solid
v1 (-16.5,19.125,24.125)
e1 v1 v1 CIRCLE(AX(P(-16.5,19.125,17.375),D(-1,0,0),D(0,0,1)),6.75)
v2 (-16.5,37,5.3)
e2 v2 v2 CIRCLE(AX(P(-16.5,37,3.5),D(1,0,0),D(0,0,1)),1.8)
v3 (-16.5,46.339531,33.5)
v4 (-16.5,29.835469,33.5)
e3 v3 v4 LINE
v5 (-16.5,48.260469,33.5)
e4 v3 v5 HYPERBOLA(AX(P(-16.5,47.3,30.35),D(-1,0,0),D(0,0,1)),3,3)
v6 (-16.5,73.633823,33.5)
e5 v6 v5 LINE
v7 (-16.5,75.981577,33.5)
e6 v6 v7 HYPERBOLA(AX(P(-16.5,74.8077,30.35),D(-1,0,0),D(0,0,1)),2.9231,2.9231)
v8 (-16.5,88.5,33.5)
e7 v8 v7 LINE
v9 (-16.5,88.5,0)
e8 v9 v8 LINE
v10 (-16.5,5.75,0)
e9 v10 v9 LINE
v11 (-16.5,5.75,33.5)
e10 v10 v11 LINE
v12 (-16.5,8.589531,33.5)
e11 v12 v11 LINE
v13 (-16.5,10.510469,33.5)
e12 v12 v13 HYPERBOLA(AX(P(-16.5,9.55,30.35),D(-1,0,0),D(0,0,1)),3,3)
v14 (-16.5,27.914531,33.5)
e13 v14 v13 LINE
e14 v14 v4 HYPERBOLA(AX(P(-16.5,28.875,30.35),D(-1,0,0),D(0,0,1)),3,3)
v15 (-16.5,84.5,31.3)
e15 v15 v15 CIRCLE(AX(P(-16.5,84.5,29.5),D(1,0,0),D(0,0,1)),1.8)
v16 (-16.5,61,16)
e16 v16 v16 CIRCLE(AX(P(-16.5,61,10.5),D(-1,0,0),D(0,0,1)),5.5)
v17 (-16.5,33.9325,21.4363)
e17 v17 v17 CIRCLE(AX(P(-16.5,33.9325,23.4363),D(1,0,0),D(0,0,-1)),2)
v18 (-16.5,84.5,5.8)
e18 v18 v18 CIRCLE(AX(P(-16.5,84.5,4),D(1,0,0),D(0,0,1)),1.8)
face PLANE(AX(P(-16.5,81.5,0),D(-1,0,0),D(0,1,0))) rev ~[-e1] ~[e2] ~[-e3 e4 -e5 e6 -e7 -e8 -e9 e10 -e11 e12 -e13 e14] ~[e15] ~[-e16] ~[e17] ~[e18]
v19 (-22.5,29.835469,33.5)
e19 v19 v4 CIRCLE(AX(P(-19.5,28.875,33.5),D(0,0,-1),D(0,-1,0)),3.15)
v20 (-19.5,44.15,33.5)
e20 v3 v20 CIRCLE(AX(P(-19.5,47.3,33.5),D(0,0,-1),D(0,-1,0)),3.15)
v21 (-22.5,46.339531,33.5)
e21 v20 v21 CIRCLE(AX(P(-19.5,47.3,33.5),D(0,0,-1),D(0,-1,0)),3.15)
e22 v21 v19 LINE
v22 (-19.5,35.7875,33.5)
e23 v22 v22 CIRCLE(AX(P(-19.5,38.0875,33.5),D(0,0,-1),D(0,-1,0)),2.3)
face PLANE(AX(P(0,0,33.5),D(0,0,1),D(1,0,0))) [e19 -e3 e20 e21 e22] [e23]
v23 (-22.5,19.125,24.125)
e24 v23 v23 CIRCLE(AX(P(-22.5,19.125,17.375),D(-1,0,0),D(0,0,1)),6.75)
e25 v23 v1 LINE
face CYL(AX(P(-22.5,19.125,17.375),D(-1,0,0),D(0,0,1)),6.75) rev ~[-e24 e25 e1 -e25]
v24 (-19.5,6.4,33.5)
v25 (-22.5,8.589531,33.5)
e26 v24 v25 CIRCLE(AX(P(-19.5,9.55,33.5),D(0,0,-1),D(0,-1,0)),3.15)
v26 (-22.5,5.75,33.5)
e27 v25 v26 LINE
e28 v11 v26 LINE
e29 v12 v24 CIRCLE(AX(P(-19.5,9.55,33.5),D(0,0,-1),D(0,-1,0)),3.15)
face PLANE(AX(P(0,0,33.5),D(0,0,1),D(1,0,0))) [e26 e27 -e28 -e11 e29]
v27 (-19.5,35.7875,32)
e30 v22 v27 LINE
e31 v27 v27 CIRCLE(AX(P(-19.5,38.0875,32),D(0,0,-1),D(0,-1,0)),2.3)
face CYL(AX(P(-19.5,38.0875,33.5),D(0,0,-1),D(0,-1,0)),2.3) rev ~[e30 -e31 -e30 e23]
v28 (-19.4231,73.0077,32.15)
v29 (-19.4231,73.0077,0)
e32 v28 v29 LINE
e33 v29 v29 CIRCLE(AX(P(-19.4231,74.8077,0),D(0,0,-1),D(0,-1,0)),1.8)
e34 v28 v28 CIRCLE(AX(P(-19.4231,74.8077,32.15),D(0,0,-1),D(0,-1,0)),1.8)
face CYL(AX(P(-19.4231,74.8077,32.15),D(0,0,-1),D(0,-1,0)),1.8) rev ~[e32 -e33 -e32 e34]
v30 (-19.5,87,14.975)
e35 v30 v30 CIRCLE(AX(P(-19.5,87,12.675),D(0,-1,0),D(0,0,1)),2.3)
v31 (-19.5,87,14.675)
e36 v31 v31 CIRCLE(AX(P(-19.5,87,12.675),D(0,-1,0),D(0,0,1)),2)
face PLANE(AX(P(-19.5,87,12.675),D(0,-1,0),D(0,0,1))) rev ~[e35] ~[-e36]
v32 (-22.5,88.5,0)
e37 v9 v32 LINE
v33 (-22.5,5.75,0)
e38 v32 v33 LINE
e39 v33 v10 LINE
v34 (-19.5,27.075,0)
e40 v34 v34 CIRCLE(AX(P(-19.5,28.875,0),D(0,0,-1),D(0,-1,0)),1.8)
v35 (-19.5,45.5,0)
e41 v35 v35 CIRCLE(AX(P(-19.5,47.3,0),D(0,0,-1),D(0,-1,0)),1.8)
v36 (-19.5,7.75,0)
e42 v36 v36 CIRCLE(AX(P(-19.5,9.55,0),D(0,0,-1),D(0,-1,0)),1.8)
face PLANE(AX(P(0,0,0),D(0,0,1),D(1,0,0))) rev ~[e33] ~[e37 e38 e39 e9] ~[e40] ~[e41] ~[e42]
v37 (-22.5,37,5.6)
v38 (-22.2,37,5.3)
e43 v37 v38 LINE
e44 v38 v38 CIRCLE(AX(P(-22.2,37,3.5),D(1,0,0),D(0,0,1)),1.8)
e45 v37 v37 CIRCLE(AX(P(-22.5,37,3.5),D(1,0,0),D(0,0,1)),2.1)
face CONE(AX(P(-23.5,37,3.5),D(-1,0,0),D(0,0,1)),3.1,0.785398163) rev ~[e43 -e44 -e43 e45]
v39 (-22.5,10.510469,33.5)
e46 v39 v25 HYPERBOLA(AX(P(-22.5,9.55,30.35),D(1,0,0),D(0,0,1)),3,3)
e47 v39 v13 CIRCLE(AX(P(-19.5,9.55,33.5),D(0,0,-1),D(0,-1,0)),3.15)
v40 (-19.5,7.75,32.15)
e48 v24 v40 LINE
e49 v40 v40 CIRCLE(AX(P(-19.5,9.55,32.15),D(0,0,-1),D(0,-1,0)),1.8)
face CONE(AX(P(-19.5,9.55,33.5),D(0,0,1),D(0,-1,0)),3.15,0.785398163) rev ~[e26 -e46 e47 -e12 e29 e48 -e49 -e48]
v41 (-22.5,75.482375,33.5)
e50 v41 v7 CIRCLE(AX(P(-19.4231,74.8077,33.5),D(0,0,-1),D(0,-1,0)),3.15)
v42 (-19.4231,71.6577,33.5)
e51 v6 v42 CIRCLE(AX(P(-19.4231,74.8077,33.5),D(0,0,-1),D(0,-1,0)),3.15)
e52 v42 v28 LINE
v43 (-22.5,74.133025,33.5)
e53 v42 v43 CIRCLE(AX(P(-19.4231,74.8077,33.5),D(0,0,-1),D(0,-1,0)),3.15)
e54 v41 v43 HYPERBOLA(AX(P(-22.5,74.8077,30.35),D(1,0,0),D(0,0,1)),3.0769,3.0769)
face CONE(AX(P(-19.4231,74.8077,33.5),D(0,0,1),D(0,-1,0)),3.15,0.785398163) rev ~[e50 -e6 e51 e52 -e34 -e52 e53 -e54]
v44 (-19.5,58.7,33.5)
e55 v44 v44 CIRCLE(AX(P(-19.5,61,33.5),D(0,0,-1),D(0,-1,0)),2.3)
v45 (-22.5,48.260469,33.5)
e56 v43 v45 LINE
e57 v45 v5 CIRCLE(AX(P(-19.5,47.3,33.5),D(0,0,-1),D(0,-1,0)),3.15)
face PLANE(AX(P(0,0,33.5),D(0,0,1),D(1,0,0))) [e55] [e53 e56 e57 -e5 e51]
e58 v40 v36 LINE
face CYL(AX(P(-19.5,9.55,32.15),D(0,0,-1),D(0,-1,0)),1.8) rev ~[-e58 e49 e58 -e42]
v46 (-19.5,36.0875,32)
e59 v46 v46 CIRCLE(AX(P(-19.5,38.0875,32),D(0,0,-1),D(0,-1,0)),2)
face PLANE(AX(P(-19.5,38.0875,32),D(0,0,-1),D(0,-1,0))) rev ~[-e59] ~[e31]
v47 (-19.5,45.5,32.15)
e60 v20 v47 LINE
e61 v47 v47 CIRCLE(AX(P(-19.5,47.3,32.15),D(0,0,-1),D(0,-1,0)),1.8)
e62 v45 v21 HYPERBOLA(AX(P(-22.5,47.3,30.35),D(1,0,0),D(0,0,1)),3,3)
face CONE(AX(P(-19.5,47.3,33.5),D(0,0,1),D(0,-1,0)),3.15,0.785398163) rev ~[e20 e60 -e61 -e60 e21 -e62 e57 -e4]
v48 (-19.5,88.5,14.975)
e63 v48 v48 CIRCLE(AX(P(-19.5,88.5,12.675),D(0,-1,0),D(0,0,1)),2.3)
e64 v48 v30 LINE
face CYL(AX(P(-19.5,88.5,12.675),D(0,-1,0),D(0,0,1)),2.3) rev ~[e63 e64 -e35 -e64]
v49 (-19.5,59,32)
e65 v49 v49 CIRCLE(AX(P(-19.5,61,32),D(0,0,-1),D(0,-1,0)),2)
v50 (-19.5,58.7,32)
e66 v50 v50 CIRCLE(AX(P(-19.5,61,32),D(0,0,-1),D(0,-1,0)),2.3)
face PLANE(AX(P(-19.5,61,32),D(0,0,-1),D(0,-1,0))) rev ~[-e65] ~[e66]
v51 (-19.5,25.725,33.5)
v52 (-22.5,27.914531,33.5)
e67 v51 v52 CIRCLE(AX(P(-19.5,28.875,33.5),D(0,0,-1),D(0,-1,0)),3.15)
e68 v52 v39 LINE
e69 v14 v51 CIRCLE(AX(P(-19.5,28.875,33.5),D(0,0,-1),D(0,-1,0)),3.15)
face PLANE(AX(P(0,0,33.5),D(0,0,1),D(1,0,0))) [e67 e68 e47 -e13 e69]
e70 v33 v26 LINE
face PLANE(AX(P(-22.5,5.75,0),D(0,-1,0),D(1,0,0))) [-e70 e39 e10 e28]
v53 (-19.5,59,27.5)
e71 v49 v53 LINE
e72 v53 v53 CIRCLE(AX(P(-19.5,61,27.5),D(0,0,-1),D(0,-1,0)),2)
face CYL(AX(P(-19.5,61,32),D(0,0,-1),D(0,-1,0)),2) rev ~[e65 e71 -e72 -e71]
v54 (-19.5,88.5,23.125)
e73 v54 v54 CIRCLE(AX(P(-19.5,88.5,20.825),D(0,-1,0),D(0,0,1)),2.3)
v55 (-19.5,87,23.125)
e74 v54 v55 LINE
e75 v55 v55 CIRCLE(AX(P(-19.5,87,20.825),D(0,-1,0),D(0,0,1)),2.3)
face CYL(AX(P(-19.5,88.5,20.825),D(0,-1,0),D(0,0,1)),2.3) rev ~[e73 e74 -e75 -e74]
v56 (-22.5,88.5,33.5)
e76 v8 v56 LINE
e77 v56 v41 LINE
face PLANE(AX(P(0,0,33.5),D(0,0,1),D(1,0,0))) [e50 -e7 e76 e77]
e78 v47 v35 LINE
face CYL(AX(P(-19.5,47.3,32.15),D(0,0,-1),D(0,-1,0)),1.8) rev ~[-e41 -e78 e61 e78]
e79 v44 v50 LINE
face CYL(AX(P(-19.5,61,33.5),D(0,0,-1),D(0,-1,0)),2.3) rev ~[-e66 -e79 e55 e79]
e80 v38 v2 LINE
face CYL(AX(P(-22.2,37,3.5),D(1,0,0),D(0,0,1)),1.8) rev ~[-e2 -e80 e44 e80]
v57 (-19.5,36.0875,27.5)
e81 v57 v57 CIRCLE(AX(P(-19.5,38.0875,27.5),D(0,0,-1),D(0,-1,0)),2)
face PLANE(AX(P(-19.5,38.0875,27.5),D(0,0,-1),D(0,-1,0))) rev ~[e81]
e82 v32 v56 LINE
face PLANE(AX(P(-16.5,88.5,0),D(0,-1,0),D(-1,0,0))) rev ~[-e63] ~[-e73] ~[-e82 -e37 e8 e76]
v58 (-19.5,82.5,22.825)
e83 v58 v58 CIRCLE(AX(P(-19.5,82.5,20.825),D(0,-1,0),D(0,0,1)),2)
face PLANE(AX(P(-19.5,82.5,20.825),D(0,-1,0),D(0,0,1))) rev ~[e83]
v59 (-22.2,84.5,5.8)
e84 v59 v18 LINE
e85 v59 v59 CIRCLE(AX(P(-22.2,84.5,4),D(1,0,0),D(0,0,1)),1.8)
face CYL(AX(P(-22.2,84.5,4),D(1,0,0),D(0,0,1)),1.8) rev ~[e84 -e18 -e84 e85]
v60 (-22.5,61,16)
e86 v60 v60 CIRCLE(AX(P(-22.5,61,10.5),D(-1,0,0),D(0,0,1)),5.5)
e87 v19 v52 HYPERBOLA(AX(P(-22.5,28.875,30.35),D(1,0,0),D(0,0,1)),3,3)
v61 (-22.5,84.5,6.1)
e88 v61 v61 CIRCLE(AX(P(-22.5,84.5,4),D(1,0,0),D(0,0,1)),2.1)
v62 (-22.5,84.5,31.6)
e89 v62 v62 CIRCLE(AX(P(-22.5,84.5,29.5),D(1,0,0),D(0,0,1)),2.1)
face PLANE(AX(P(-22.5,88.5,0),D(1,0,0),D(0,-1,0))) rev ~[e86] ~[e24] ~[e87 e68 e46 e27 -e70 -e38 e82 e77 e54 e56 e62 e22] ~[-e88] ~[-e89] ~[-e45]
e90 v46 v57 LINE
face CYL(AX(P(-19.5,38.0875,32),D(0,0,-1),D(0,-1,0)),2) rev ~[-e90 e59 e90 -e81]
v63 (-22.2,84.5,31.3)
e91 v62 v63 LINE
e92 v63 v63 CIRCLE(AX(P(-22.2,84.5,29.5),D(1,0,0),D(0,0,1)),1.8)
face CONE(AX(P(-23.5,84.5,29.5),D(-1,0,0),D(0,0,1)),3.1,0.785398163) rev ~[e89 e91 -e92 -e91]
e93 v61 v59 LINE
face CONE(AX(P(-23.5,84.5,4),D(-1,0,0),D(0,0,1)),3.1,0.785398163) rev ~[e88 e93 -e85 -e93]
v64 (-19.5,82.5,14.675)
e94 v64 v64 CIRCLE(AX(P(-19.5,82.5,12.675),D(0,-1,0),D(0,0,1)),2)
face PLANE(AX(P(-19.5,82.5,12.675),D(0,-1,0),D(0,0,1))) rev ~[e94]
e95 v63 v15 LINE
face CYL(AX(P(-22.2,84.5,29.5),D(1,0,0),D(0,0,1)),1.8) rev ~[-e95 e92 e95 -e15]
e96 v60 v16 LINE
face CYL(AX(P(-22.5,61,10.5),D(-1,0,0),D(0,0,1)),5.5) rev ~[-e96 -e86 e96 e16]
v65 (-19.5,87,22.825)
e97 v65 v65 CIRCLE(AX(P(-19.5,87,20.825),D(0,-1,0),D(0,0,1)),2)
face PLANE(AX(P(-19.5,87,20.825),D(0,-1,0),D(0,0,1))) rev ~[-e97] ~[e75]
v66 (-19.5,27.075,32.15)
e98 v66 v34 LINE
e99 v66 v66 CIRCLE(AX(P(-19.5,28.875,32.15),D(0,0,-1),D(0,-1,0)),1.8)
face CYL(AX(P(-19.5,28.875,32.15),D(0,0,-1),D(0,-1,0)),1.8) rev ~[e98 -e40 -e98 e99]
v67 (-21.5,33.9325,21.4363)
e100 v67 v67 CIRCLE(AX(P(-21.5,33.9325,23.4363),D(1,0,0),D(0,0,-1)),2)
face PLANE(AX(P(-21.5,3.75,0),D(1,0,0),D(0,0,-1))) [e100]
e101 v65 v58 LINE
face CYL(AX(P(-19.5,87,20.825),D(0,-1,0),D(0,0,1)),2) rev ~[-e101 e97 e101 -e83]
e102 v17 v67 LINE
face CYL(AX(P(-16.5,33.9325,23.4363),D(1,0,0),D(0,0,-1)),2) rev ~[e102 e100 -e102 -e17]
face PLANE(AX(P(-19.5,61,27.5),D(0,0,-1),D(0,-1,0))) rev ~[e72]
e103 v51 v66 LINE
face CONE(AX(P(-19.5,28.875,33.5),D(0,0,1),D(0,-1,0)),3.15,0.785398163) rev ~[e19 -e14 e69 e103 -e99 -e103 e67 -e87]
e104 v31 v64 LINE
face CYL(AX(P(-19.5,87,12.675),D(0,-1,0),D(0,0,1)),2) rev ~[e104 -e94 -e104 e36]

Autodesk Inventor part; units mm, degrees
ref_plane "YZ Plane" through (0, 0, 0) normal (1, 0, 0) x (0, 1, 0)
ref_plane "XZ Plane" through (0, 0, 0) normal (0, 1, 0) x (-1, 0, 0)
ref_plane "Work Plane1" through (0, 0, 0) normal (0, 0, 1) x (1, 0, 0)
sketch "Sketch1" plane through (0, 0, 0) normal (0, 0, 1) x (1, 0, 0)
  line L0 (23.5, 88.5) -> (-23.5, 88.5) projected
  line L1 (-23.5, 88.5) -> (-23.5, 36.5) projected
  line L2 (-26.5, 33.5) -> (-89, 33.5) projected
  line L3 (-89, 33.5) -> (-89, -72.5) projected
  line L4 (-89, -72.5) -> (-77, -72.5) projected
  line L5 (-74, -75.5) -> (-74, -93.5) projected
  line L6 (-74, -93.5) -> (74, -93.5) projected
  line L7 (74, -93.5) -> (74, -75.5) projected
  line L8 (77, -72.5) -> (89, -72.5) projected
  line L9 (89, -72.5) -> (89, 33.5) projected
  line L10 (89, 33.5) -> (26.5, 33.5) projected
  line L11 (23.5, 36.5) -> (23.5, 88.5) projected
  line L12 (-4.5, 81.5) -> (-4.5, 36.5) projected
  line L13 (-7.5, 33.5) -> (-13.5, 33.5) projected
  line L14 (-16.5, 36.5) -> (-16.5, 81.5) projected
  line L15 (7.5, 84.5) -> (13.5, 84.5) projected
  line L16 (16.5, 81.5) -> (16.5, 36.5) projected
  line L17 (13.5, 33.5) -> (7.5, 33.5) projected
  line L18 (4.5, 36.5) -> (4.5, 81.5) projected
  line L19 (-13.5, 84.5) -> (-7.5, 84.5) projected
  line L20 (-16.5, 88.5) -> (-22.5, 88.5)
  line L21 (-22.5, 88.5) -> (-22.5, 3.75)
  line L22 (-22.5, 3.75) -> (-16.5, 3.75)
  line L23 (-16.5, 3.75) -> (-16.5, 88.5)
  line L24 (-32.2, 4.75) -> (-59.9, 4.75)
  arc A0 (13.5, 33.5) -> (16.5, 36.5) centre (13.5, 36.5) ccw projected
  arc A1 (4.5, 36.5) -> (7.5, 33.5) centre (7.5, 36.5) ccw projected
  arc A2 (7.5, 84.5) -> (4.5, 81.5) centre (7.5, 81.5) ccw projected
  arc A3 (16.5, 81.5) -> (13.5, 84.5) centre (13.5, 81.5) ccw projected
  arc A4 (-4.5, 81.5) -> (-7.5, 84.5) centre (-7.5, 81.5) ccw projected
  arc A5 (-7.5, 33.5) -> (-4.5, 36.5) centre (-7.5, 36.5) ccw projected
  arc A6 (-16.5, 36.5) -> (-13.5, 33.5) centre (-13.5, 36.5) ccw projected
  arc A7 (-13.5, 84.5) -> (-16.5, 81.5) centre (-13.5, 81.5) ccw projected
  arc A8 (-26.5, 33.5) -> (-23.5, 36.5) centre (-26.5, 36.5) ccw projected
  arc A9 (-74, -75.5) -> (-77, -72.5) centre (-77, -75.5) ccw projected
  arc A10 (77, -72.5) -> (74, -75.5) centre (77, -75.5) ccw projected
  arc A11 (23.5, 36.5) -> (26.5, 33.5) centre (26.5, 36.5) ccw projected
  circle A12 centre (21.5, -85.5) radius 1.8 projected
  circle A13 centre (-64.5, -85.5) radius 1.8 projected
  circle A14 centre (83.4, -16.3889) radius 1.8 projected
  circle A15 centre (-83.4, -19.2889) radius 1.8 projected
  circle A16 centre (-21.5, -85.5) radius 1.8 projected
  circle A17 centre (64.5, -85.5) radius 1.8 projected
  circle A18 centre (39.125, 4.3375) radius 1.0065 projected
  circle A19 centre (-72.95, 4.275) radius 1.0065 projected
  circle A20 centre (39.125, 25.9125) radius 1.0065 projected
  circle A21 centre (72.95, 12.275) radius 1.0065 projected
  circle A22 centre (86, 30.5) radius 1.0065 projected
  circle A23 centre (-86, 30.5) radius 1.0065 projected
  circle A24 centre (-39.125, 12.3375) radius 1.0065 projected
  circle A25 centre (-72.95, 25.975) radius 1.0065 projected
  circle A26 centre (-72.95, 12.275) radius 1.0065 projected
  circle A27 centre (-39.125, 25.9125) radius 1.0065 projected
  circle A28 centre (-86, 7.75) radius 1.0065 projected
  circle A29 centre (86, 7.75) radius 1.0065 projected
  circle A30 centre (72.95, 25.975) radius 1.0065 projected
  circle A31 centre (39.125, 12.3375) radius 1.0065 projected
  circle A32 centre (-39.125, 4.3375) radius 1.0065 projected
  circle A33 centre (72.95, 4.275) radius 1.0065 projected
  circle A34 centre (78, -67.1725) radius 1.2295 projected
  circle A35 centre (-24.1, -73.1) radius 1.2295 projected
  circle A36 centre (24.1, -24.9) radius 1.2295 projected
  circle A37 centre (-42.4984, -44.6666) radius 1.2295 projected
  circle A38 centre (-79, -42.3889) radius 1.2295 projected
  circle A39 centre (-19.5, 28.875) radius 1.2295 projected
  circle A40 centre (19.5, 9.55) radius 1.2295 projected
  circle A41 centre (19.5, 47.3) radius 1.2295 projected
  circle A42 centre (-19.5, 47.3) radius 1.2295 projected
  circle A43 centre (0, 74.7) radius 1.2295 projected
  circle A44 centre (-19.4231, 74.8077) radius 1.2295 projected
  circle A45 centre (19.5, 74.7) radius 1.2295 projected
  circle A46 centre (0, 49.05) radius 1.2295 projected
  circle A47 centre (19.5, 28.875) radius 1.2295 projected
  circle A48 centre (0, 19.125) radius 1.2295 projected
  circle A49 centre (-19.5, 9.55) radius 1.2295 projected
  circle A50 centre (-78, -67.1725) radius 1.2295 projected
  circle A51 centre (-24.1, -24.9) radius 1.2295 projected
  circle A52 centre (24.1, -73.1) radius 1.2295 projected
  circle A53 centre (42.5, -44.6649) radius 1.2295 projected
  circle A54 centre (79, -42.3889) radius 1.2295 projected
  line L25 (74, -12.9454) -> (74, -38.6649) projected
  line L26 (32.5736, -41.3399) -> (10.2484, -66.6122) projected
  line L27 (40.7223, -24.1882) -> (40.7223, -2.7315) projected
  line L28 (15.0791, 0.2685) -> (31.7223, 0.2685) projected
  line L29 (-68.7516, -10.9592) -> (-46.0313, -36.6788) projected
  line L30 (-74, -38.6649) -> (-74, -12.9454) projected
  line L31 (43.7223, 0.2685) -> (62.6769, 0.2685) projected
  line L32 (-40.7223, -2.7315) -> (-40.7223, -24.1882) projected
  line L33 (-45.9707, -26.1743) -> (-64.9252, -4.7177) projected
  line L34 (46.0313, -36.6788) -> (68.7516, -10.9592) projected
  line L35 (-62.6769, 0.2685) -> (-43.7223, 0.2685) projected
  line L36 (34.7223, -2.7315) -> (34.7223, -24.9078) projected
  line L37 (29.5555, -26.9826) -> (10.5667, -7.1519) projected
  line L38 (-31.598, -53.0174) -> (-25.9833, -59.3733) projected
  line L39 (-10.5667, -7.1519) -> (-29.5555, -26.9826) projected
  line L40 (-34.7223, -24.9078) -> (-34.7223, -2.7315) projected
  line L41 (-31.7223, 0.2685) -> (-15.0791, 0.2685) projected
  line L42 (25.9833, -59.3733) -> (31.598, -53.0174) projected
  line L43 (64.9252, -4.7177) -> (45.9707, -26.1743) projected
  line L44 (-10.2484, -66.6122) -> (-32.5736, -41.3399) projected
  line L45 (-32.4921, -37.2789) -> (-10.1668, -13.9638) projected
  line L46 (10.1668, -13.9638) -> (32.4921, -37.2789) projected
  line L47 (29.5955, -81.1563) -> (25.3044, -62.0157) projected
  arc A55 (25.9833, -59.3733) -> (25.3044, -62.0157) centre (28.2317, -61.3594) ccw projected
  line L48 (43.9754, -47.6649) -> (68.9203, -47.6649) projected
  arc A56 (71.5475, -52.1134) -> (68.9203, -47.6649) centre (68.9203, -50.6649) ccw projected
  line L49 (71.5475, -52.1134) -> (58.4661, -75.8408) projected
  line L50 (46.5943, -83.5) -> (32.5229, -83.5) projected
  arc A57 (29.5955, -81.1563) -> (32.5229, -83.5) centre (32.5229, -80.5) ccw projected
  line L51 (-5, -16.0387) -> (-5, -64.6261) projected
  arc A58 (-10.2484, -66.6122) -> (-5, -64.6261) centre (-8, -64.6261) ccw projected
  arc A59 (-32.4921, -37.2789) -> (-32.5736, -41.3399) centre (-30.3253, -39.3537) ccw projected
  arc A60 (-5, -16.0387) -> (-10.1668, -13.9638) centre (-8, -16.0387) ccw projected
  arc A61 (-40.7223, -2.7315) -> (-43.7223, 0.2685) centre (-43.7223, -2.7315) ccw projected
  arc A62 (-45.9707, -26.1743) -> (-40.7223, -24.1882) centre (-43.7223, -24.1882) ccw projected
  arc A63 (-62.6769, 0.2685) -> (-64.9252, -4.7177) centre (-62.6769, -2.7315) ccw projected
  arc A64 (-25.3044, -62.0157) -> (-25.9833, -59.3733) centre (-28.2317, -61.3594) ccw projected
  line L52 (-25.3044, -62.0157) -> (-29.5955, -81.1563) projected
  arc A65 (-32.5229, -83.5) -> (-29.5955, -81.1563) centre (-32.5229, -80.5) ccw projected
  line L53 (-32.5229, -83.5) -> (-46.5943, -83.5) projected
  line L54 (-58.4661, -75.8408) -> (-71.5475, -52.1134) projected
  arc A66 (-68.9203, -47.6649) -> (-71.5475, -52.1134) centre (-68.9203, -50.6649) ccw projected
  line L55 (-68.9203, -47.6649) -> (-43.9754, -47.6649) projected
  line L56 (-49.775, 11.125) -> (-62.3, 11.125) projected
  arc A67 (-62.3, 27.125) -> (-62.3, 11.125) centre (-62.3, 19.125) ccw projected
  line L57 (-62.3, 27.125) -> (-49.775, 27.125) projected
  arc A68 (-49.775, 11.125) -> (-49.775, 27.125) centre (-49.775, 19.125) ccw projected
  arc A69 (-31.7223, 0.2685) -> (-34.7223, -2.7315) centre (-31.7223, -2.7315) ccw projected
  arc A70 (-12.9578, -0.6102) -> (-15.0791, 0.2685) centre (-15.0791, -2.7315) ccw projected
  line L58 (-12.9578, -0.6102) -> (-10.6122, -2.9558) projected
  arc A71 (-10.5667, -7.1519) -> (-10.6122, -2.9558) centre (-12.7335, -5.0771) ccw projected
  arc A72 (-34.7223, -24.9078) -> (-29.5555, -26.9826) centre (-31.7223, -24.9078) ccw projected
  arc A73 (71, -41.6649) -> (74, -38.6649) centre (71, -38.6649) ccw projected
  line L59 (71, -41.6649) -> (48.2797, -41.6649) projected
  arc A74 (46.0313, -36.6788) -> (48.2797, -41.6649) centre (48.2797, -38.6649) ccw projected
  arc A75 (74, -12.9454) -> (68.7516, -10.9592) centre (71, -12.9454) ccw projected
  arc A76 (40.7223, -24.1882) -> (45.9707, -26.1743) centre (43.7223, -24.1882) ccw projected
  arc A77 (43.7223, 0.2685) -> (40.7223, -2.7315) centre (43.7223, -2.7315) ccw projected
  arc A78 (64.9252, -4.7177) -> (62.6769, 0.2685) centre (62.6769, -2.7315) ccw projected
  arc A79 (5, -64.6261) -> (10.2484, -66.6122) centre (8, -64.6261) ccw projected
  line L60 (5, -64.6261) -> (5, -16.0387) projected
  arc A80 (10.1668, -13.9638) -> (5, -16.0387) centre (8, -16.0387) ccw projected
  arc A81 (32.5736, -41.3399) -> (32.4921, -37.2789) centre (30.3253, -39.3537) ccw projected
  arc A82 (29.5555, -26.9826) -> (34.7223, -24.9078) centre (31.7223, -24.9078) ccw projected
  arc A83 (10.6122, -2.9558) -> (10.5667, -7.1519) centre (12.7335, -5.0771) ccw projected
  line L61 (10.6122, -2.9558) -> (12.9578, -0.6102) projected
  arc A84 (15.0791, 0.2685) -> (12.9578, -0.6102) centre (15.0791, -2.7315) ccw projected
  arc A85 (34.7223, -2.7315) -> (31.7223, 0.2685) centre (31.7223, -2.7315) ccw projected
  arc A86 (-48.2797, -41.6649) -> (-46.0313, -36.6788) centre (-48.2797, -38.6649) ccw projected
  line L62 (-48.2797, -41.6649) -> (-71, -41.6649) projected
  arc A87 (-74, -38.6649) -> (-71, -41.6649) centre (-71, -38.6649) ccw projected
  arc A88 (-68.7516, -10.9592) -> (-74, -12.9454) centre (-71, -12.9454) ccw projected
  line L63 (49.775, 27.125) -> (62.3, 27.125) projected
  arc A89 (62.3, 11.125) -> (62.3, 27.125) centre (62.3, 19.125) ccw projected
  line L64 (62.3, 11.125) -> (49.775, 11.125) projected
  arc A90 (49.775, 27.125) -> (49.775, 11.125) centre (49.775, 19.125) ccw projected
  arc A91 (53.1556, -75.734) -> (58.4661, -75.8408) centre (55.8389, -74.3924) ccw projected
  line L65 (53.1556, -75.734) -> (41.2921, -52.0066) projected
  arc A92 (43.9754, -47.6649) -> (41.2921, -52.0066) centre (43.9754, -50.6649) ccw projected
  arc A93 (36.5297, -53.662) -> (31.598, -53.0174) centre (33.8464, -55.0036) ccw projected
  line L66 (36.5297, -53.662) -> (49.2776, -79.1584) projected
  arc A94 (46.5943, -83.5) -> (49.2776, -79.1584) centre (46.5943, -80.5) ccw projected
  arc A95 (-49.2776, -79.1584) -> (-46.5943, -83.5) centre (-46.5943, -80.5) ccw projected
  line L67 (-49.2776, -79.1584) -> (-36.5297, -53.662) projected
  arc A96 (-31.598, -53.0174) -> (-36.5297, -53.662) centre (-33.8464, -55.0036) ccw projected
  arc A97 (-41.2921, -52.0066) -> (-43.9754, -47.6649) centre (-43.9754, -50.6649) ccw projected
  line L68 (-41.2921, -52.0066) -> (-53.1556, -75.734) projected
  arc A98 (-58.4661, -75.8408) -> (-53.1556, -75.734) centre (-55.8389, -74.3924) ccw projected
  point P0 (0, 0)
  point P1 (-16.5, 36.5)
  point P2 (-16.5, 81.5)
  point P3 (7.5, 81.5)
  point P4 (13.5, 81.5)
  point P5 (-7.5, 81.5)
  point P6 (-13.5, 81.5)
  point P7 (-29, -78.5)
  point P8 (-57, -78.5)
  point P9 (29, -78.5)
  point P10 (57, -78.5)
  dimension "d0" = 1
  dimension "d2" = 1
ref_plane "Work Plane2" through (-89, -40.3889, 33.5) normal (0, 0, 1) x (1, 0, 0)
extrude "Extrusion1" add sketch "Sketch1" along normal up to surface (33.5 mm away) contours L23 L14 L22 L21 L0 | A39 | A42 | A44 | A49
sketch "Sketch2" plane through (-22.5, 3.75, 0) normal (-1, 0, 0) x (0, 0, 1)
  arc A0 (15.7043, 9.7757) -> (16.863, 11.545) centre (12.3771, 13.2188) ccw projected
  arc A1 (16.863, 11.545) -> (17.4685, 11.512) centre (17.375, 15.375) ccw projected
  arc A2 (17.4685, 11.512) -> (18.4285, 9.6275) centre (22.1095, 12.6893) ccw projected
  arc A3 (18.4285, 9.6275) -> (19.3146, 9.863) centre (17.375, 15.375) ccw projected
  arc A4 (19.3146, 9.863) -> (19.2121, 11.9755) centre (14.599, 10.6929) ccw projected
  arc A5 (19.2121, 11.9755) -> (19.7212, 12.3047) centre (17.375, 15.375) ccw projected
  arc A6 (19.7212, 12.3047) -> (21.6056, 11.3444) centre (22.7839, 15.9851) ccw projected
  arc A7 (21.6056, 11.3444) -> (22.184, 12.0558) centre (17.375, 15.375) ccw projected
  arc A8 (22.184, 12.0558) -> (20.8594, 13.7045) centre (17.8813, 9.9554) ccw projected
  arc A9 (20.8594, 13.7045) -> (21.0778, 14.2702) centre (17.375, 15.375) ccw projected
  arc A10 (21.0778, 14.2702) -> (23.1668, 14.6008) centre (21.3923, 19.0479) ccw projected
  arc A11 (23.1668, 14.6008) -> (23.2166, 15.5164) centre (17.375, 15.375) ccw projected
  arc A12 (23.2166, 15.5164) -> (21.1758, 16.0716) centre (20.9701, 11.288) ccw projected
  arc A13 (21.1758, 16.0716) -> (21.02, 16.6576) centre (17.375, 15.375) ccw projected
  arc A14 (21.02, 16.6576) -> (22.5157, 18.153) centre (18.4662, 20.7077) ccw projected
  arc A15 (22.5157, 18.153) -> (22.0178, 18.923) centre (17.375, 15.375) ccw projected
  arc A16 (22.0178, 18.923) -> (20.0404, 18.1726) centre (22.6858, 14.1817) ccw projected
  arc A17 (20.0404, 18.1726) -> (19.57, 18.5552) centre (17.375, 15.375) ccw projected
  arc A18 (19.57, 18.5552) -> (19.9011, 20.644) centre (15.1233, 20.3306) ccw projected
  arc A19 (19.9011, 20.644) -> (19.0457, 20.9743) centre (17.375, 15.375) ccw projected
  arc A20 (19.0457, 20.9743) -> (17.887, 19.205) centre (22.3729, 17.5312) ccw projected
  arc A21 (17.887, 19.205) -> (17.2815, 19.238) centre (17.375, 15.375) ccw projected
  arc A22 (17.2815, 19.238) -> (16.3215, 21.1225) centre (12.6405, 18.0607) ccw projected
  arc A23 (16.3215, 21.1225) -> (15.4354, 20.887) centre (17.375, 15.375) ccw projected
  arc A24 (15.4354, 20.887) -> (15.5379, 18.7745) centre (20.151, 20.0571) ccw projected
  arc A25 (15.5379, 18.7745) -> (15.0288, 18.4453) centre (17.375, 15.375) ccw projected
  arc A26 (15.0288, 18.4453) -> (13.1444, 19.4056) centre (11.9661, 14.7649) ccw projected
  arc A27 (13.1444, 19.4056) -> (12.566, 18.6942) centre (17.375, 15.375) ccw projected
  arc A28 (12.566, 18.6942) -> (13.8906, 17.0455) centre (16.8687, 20.7946) ccw projected
  arc A29 (13.8906, 17.0455) -> (13.6722, 16.4798) centre (17.375, 15.375) ccw projected
  arc A30 (13.6722, 16.4798) -> (11.5832, 16.1492) centre (13.3577, 11.7021) ccw projected
  arc A31 (11.5832, 16.1492) -> (11.5334, 15.2336) centre (17.375, 15.375) ccw projected
  arc A32 (11.5334, 15.2336) -> (13.5742, 14.6784) centre (13.7799, 19.462) ccw projected
  arc A33 (13.5742, 14.6784) -> (13.73, 14.0924) centre (17.375, 15.375) ccw projected
  arc A34 (13.73, 14.0924) -> (12.2343, 12.597) centre (16.2838, 10.0423) ccw projected
  arc A35 (12.2343, 12.597) -> (12.7322, 11.827) centre (17.375, 15.375) ccw projected
  arc A36 (12.7322, 11.827) -> (14.7096, 12.5774) centre (12.0642, 16.5683) ccw projected
  arc A37 (14.7096, 12.5774) -> (15.18, 12.1948) centre (17.375, 15.375) ccw projected
  arc A38 (15.18, 12.1948) -> (14.8489, 10.106) centre (19.6267, 10.4194) ccw projected
  arc A39 (14.8489, 10.106) -> (15.7043, 9.7757) centre (17.375, 15.375) ccw projected
  circle A40 centre (17.375, 15.375) radius 6.75
  circle A41 centre (17.375, 15.375) radius 5.8433
  line L0 (23.2183, 15.375) -> (24.125, 15.375)
  circle A42 centre (10.5, 57.25) radius 5.5 projected
  point P0 (0, -3.75)
  dimension "d6" = 13.5
  dimension "d5" = 0.9067
  dimension "d9" = 11
extrude "Extrusion2" cut sketch "Sketch2" against normal up to next contours A39 A38 A37 A36 A35 A34 A33 A32 A31 A30 A29 A28 A27 A26 A25 A24 A23 A22 A21 A20 A19 A18 A17 A16 A15 A14 A13 A12 A11 A10 A9 A8 A7 A6 A5 A4 A3 A2 A1 A0 | A0 A1 A2 A41 | A41 A36 A37 A38 | A4 A5 A6 A41 | A41 A32 A33 A34 | A8 A9 A10 A41 | A41 A28 A29 A30 | A41 A24 A25 A26 | A12 A13 A14 A41 | A41 A20 A21 A22 | A16 A17 A18 A41 | A40 | A42
sketch "Sketch3" plane through (-16.5, 3.75, 0) normal (1, 0, 0) x (0, 0, -1)
  circle A0 centre (-23.4363, 30.1825) radius 2 projected
  point P0 (0, -3.75)
extrude "Extrusion3" cut sketch "Sketch3" against normal blind 5
ref_plane "Work Plane3" through (-23.5, 3.75, 0) normal (-1, 0, 0) x (0, 0, 1)
sketch "Sketch5" plane through (-23.5, 3.75, 0) normal (-1, 0, 0) x (0, 0, 1)
  circle A0 centre (29.5, 80.75) radius 2.1 projected
  circle A1 centre (4, 80.75) radius 2.1 projected
  circle A2 centre (3.5, 33.25) radius 2.1 projected
  point P0 (0, -3.75)
hole "Hole1" at (-23.5, 84.5, 29.5) at (-23.5, 84.5, 4) at (-23.5, 37, 3.5) direction (1, 0, 0) diameter 3.6 end through all countersink diameter 6.2 countersink angle 90 clearance for "Countersunk Flat Head Screw ISO 2009/7046" size "M3" standard "ISO"
sketch "Sketch6" plane through (-22.5, 3.75, 33.5) normal (0, 0, 1) x (1, 0, 0)
  line L0 (0, 8.625) -> (0, 22.125) projected
  line L1 (1, 32.1825) -> (1, 28.1825) projected
  line L2 (0, 31.15) -> (0, 35.35) projected
  line L3 (0, 51.75) -> (0, 62.75) projected
  line L4 (0, 78.65) -> (0, 82.85) projected
  line L5 (0, 78.65) -> (0, 82.85) projected
  line L6 (6, 0) -> (0, 0) projected
  line L7 (6, 84.75) -> (6, 0) projected
  line L8 (0, 84.75) -> (6, 84.75) projected
  line L9 (0, 0) -> (0, 84.75) projected
  line L10 (6, 28.125) -> (0, 28.125)
  line L11 (0, 28.125) -> (0, 35.35)
  line L12 (0, 35.35) -> (6, 35.35)
  line L13 (6, 35.35) -> (6, 28.125)
  line L14 (0, 8.625) -> (6, 8.625) projected
  line L15 (6, 8.625) -> (0, 8.625)
  line L16 (0, 8.625) -> (0, 22.125)
  line L17 (0, 22.125) -> (6, 22.125)
  line L18 (6, 22.125) -> (6, 8.625)
  line L19 (6, 78.95) -> (0.3, 78.95) projected
  line L20 (6, 84.75) -> (0, 84.75) projected
  line L21 (6, 78.95) -> (0, 78.95)
  line L22 (0, 78.95) -> (0, 84.75)
  line L23 (0, 84.75) -> (6, 84.75)
  line L24 (6, 84.75) -> (6, 78.95)
  line L25 (0, 51.75) -> (6, 51.75) projected
  line L26 (0, 51.75) -> (0, 62.75) projected
  line L27 (6, 51.75) -> (0, 51.75)
  line L28 (0, 51.75) -> (0, 62.75)
  line L29 (0, 62.75) -> (6, 62.75)
  line L30 (6, 62.75) -> (6, 51.75)
  line L31 (6, 0) -> (0, 0)
  line L32 (0, 0) -> (0, 4)
  line L33 (0, 4) -> (6, 4)
  line L34 (6, 4) -> (6, 0)
  circle A0 centre (3, 5.8) radius 1.8
  line L35 (6, 22.125) -> (0, 28.125)
  line L36 (0, 22.125) -> (6, 28.125)
  line L37 (6, 35.35) -> (0, 51.75)
  line L38 (0, 35.35) -> (6, 51.75)
  line L39 (0.3, 82.55) -> (0.3, 78.95) projected
  line L40 (6, 62.75) -> (0.3, 78.95)
  line L41 (6, 82.55) -> (6, 78.95) projected
  line L42 (0.3, 78.95) -> (6, 78.95)
  line L43 (6, 78.95) -> (0, 62.75)
  point P0 (22.5, -3.75)
  point P1 (3, 25.125)
  point P2 (3.0769, 71.0577)
  point P3 (3, 43.55)
  dimension "d20" = 4
  dimension "d21" = 3.6
  dimension "d22" = 3
  dimension "d23" = 3
hole "Hole2" at (-19.5, 28.875, 33.5) at (-19.5, 9.55, 33.5) at (-19.4231, 74.8077, 33.5) at (-19.5, 47.3, 33.5) direction (0, 0, -1) diameter 3.6 end through all countersink diameter 6.3 countersink angle 90 clearance for "Countersunk Flat Head Screw ISO 2009/7046" size "M3" standard "ISO"
sketch "Sketch9" plane through (-22.5, 88.5, 0) normal (0, 1, 0) x (1, 0, 0)
  circle A0 centre (22.5, -20.825) radius 2.3 projected
  circle A1 centre (22.5, -12.675) radius 2.3 projected
  line L0 (18, -33.5) -> (27, -33.5) projected
  line L1 (27, 0) -> (27, -33.5) projected
  line L2 (27, 0) -> (18, 0) projected
  line L3 (18, 0) -> (18, -33.5) projected
  line L4 (22.5, -20.825) -> (0, -20.825)
  line L5 (0, -24.125) -> (0, -10.625) projected
  line L6 (22.5, -12.675) -> (0, -12.675)
  line L7 (6, 0) -> (6, -33.5) projected
  point P0 (22.5, 0)
  point P1 (3, -20.825)
  point P2 (3, -12.675)
  dimension "d45" = 3
  dimension "d46" = 3
  dimension "d47" = 3
  dimension "d48" = 3
hole "Hole5" at (-19.5, 88.5, 20.825) at (-19.5, 88.5, 12.675) direction (0, -1, 0) diameter 4 depth 6 counterbore diameter 4.6 counterbore depth 1.5
sketch "Sketch10" plane through (-19.5, 47.3, 33.5) normal (0, 0, 1) x (1, 0, 0)
  line L0 (-3, 8.2) -> (-3, 19.2) projected
  arc A0 (3, -17.4645) -> (-3, -17.4645) centre (0, -18.425) ccw projected
  arc A1 (-3, -0.9605) -> (3, -0.9605) centre (0, 0) ccw projected
  arc A2 (3, -17.4645) -> (-3, -17.4645) centre (0, -18.425) ccw projected
  line L1 (3, -0.9605) -> (3, -17.4645) projected
  arc A3 (-3, -0.9605) -> (3, -0.9605) centre (0, 0) ccw projected
  line L2 (-3, -17.4645) -> (-3, -0.9605) projected
  line L3 (3, 8.2) -> (-3, 8.2)
  line L4 (3, 19.2) -> (-3, 19.2)
  line L5 (-3, 19.2) -> (3, 8.2)
  line L6 (-3, 8.2) -> (3, 19.2)
  line L7 (3, -17.4645) -> (-3, -0.9605)
  line L8 (-3, -17.4645) -> (3, -0.9605)
  point P0 (19.5, -47.3)
  point P1 (0, -9.2125)
  point P2 (0, 13.7)
hole "Hole6" at (-19.5, 38.0875, 33.5) at (-19.5, 61, 33.5) direction (0, 0, -1) diameter 4 depth 6 counterbore diameter 4.6 counterbore depth 1.5
sketch "Sketch11" plane through (-22.5, 3.75, 0) normal (0, -1, 0) x (1, 0, 0)
  line L0 (6, 33.5) -> (0, 33.5) projected
  line L1 (0, 0) -> (0, 33.5) projected
  line L2 (0, 0) -> (6, 0) projected
  line L3 (6, 0) -> (6, 33.5) projected
  point P0 (22.5, 0)
extrude "Extrusion4" cut sketch "Sketch11" against normal blind 2
equation "\"d22\" = d23"
equation "\"d45\" = d46"
equation "\"d47\" = d48"
properties part number "right_gear_holder" material "Nylon 6/6"
